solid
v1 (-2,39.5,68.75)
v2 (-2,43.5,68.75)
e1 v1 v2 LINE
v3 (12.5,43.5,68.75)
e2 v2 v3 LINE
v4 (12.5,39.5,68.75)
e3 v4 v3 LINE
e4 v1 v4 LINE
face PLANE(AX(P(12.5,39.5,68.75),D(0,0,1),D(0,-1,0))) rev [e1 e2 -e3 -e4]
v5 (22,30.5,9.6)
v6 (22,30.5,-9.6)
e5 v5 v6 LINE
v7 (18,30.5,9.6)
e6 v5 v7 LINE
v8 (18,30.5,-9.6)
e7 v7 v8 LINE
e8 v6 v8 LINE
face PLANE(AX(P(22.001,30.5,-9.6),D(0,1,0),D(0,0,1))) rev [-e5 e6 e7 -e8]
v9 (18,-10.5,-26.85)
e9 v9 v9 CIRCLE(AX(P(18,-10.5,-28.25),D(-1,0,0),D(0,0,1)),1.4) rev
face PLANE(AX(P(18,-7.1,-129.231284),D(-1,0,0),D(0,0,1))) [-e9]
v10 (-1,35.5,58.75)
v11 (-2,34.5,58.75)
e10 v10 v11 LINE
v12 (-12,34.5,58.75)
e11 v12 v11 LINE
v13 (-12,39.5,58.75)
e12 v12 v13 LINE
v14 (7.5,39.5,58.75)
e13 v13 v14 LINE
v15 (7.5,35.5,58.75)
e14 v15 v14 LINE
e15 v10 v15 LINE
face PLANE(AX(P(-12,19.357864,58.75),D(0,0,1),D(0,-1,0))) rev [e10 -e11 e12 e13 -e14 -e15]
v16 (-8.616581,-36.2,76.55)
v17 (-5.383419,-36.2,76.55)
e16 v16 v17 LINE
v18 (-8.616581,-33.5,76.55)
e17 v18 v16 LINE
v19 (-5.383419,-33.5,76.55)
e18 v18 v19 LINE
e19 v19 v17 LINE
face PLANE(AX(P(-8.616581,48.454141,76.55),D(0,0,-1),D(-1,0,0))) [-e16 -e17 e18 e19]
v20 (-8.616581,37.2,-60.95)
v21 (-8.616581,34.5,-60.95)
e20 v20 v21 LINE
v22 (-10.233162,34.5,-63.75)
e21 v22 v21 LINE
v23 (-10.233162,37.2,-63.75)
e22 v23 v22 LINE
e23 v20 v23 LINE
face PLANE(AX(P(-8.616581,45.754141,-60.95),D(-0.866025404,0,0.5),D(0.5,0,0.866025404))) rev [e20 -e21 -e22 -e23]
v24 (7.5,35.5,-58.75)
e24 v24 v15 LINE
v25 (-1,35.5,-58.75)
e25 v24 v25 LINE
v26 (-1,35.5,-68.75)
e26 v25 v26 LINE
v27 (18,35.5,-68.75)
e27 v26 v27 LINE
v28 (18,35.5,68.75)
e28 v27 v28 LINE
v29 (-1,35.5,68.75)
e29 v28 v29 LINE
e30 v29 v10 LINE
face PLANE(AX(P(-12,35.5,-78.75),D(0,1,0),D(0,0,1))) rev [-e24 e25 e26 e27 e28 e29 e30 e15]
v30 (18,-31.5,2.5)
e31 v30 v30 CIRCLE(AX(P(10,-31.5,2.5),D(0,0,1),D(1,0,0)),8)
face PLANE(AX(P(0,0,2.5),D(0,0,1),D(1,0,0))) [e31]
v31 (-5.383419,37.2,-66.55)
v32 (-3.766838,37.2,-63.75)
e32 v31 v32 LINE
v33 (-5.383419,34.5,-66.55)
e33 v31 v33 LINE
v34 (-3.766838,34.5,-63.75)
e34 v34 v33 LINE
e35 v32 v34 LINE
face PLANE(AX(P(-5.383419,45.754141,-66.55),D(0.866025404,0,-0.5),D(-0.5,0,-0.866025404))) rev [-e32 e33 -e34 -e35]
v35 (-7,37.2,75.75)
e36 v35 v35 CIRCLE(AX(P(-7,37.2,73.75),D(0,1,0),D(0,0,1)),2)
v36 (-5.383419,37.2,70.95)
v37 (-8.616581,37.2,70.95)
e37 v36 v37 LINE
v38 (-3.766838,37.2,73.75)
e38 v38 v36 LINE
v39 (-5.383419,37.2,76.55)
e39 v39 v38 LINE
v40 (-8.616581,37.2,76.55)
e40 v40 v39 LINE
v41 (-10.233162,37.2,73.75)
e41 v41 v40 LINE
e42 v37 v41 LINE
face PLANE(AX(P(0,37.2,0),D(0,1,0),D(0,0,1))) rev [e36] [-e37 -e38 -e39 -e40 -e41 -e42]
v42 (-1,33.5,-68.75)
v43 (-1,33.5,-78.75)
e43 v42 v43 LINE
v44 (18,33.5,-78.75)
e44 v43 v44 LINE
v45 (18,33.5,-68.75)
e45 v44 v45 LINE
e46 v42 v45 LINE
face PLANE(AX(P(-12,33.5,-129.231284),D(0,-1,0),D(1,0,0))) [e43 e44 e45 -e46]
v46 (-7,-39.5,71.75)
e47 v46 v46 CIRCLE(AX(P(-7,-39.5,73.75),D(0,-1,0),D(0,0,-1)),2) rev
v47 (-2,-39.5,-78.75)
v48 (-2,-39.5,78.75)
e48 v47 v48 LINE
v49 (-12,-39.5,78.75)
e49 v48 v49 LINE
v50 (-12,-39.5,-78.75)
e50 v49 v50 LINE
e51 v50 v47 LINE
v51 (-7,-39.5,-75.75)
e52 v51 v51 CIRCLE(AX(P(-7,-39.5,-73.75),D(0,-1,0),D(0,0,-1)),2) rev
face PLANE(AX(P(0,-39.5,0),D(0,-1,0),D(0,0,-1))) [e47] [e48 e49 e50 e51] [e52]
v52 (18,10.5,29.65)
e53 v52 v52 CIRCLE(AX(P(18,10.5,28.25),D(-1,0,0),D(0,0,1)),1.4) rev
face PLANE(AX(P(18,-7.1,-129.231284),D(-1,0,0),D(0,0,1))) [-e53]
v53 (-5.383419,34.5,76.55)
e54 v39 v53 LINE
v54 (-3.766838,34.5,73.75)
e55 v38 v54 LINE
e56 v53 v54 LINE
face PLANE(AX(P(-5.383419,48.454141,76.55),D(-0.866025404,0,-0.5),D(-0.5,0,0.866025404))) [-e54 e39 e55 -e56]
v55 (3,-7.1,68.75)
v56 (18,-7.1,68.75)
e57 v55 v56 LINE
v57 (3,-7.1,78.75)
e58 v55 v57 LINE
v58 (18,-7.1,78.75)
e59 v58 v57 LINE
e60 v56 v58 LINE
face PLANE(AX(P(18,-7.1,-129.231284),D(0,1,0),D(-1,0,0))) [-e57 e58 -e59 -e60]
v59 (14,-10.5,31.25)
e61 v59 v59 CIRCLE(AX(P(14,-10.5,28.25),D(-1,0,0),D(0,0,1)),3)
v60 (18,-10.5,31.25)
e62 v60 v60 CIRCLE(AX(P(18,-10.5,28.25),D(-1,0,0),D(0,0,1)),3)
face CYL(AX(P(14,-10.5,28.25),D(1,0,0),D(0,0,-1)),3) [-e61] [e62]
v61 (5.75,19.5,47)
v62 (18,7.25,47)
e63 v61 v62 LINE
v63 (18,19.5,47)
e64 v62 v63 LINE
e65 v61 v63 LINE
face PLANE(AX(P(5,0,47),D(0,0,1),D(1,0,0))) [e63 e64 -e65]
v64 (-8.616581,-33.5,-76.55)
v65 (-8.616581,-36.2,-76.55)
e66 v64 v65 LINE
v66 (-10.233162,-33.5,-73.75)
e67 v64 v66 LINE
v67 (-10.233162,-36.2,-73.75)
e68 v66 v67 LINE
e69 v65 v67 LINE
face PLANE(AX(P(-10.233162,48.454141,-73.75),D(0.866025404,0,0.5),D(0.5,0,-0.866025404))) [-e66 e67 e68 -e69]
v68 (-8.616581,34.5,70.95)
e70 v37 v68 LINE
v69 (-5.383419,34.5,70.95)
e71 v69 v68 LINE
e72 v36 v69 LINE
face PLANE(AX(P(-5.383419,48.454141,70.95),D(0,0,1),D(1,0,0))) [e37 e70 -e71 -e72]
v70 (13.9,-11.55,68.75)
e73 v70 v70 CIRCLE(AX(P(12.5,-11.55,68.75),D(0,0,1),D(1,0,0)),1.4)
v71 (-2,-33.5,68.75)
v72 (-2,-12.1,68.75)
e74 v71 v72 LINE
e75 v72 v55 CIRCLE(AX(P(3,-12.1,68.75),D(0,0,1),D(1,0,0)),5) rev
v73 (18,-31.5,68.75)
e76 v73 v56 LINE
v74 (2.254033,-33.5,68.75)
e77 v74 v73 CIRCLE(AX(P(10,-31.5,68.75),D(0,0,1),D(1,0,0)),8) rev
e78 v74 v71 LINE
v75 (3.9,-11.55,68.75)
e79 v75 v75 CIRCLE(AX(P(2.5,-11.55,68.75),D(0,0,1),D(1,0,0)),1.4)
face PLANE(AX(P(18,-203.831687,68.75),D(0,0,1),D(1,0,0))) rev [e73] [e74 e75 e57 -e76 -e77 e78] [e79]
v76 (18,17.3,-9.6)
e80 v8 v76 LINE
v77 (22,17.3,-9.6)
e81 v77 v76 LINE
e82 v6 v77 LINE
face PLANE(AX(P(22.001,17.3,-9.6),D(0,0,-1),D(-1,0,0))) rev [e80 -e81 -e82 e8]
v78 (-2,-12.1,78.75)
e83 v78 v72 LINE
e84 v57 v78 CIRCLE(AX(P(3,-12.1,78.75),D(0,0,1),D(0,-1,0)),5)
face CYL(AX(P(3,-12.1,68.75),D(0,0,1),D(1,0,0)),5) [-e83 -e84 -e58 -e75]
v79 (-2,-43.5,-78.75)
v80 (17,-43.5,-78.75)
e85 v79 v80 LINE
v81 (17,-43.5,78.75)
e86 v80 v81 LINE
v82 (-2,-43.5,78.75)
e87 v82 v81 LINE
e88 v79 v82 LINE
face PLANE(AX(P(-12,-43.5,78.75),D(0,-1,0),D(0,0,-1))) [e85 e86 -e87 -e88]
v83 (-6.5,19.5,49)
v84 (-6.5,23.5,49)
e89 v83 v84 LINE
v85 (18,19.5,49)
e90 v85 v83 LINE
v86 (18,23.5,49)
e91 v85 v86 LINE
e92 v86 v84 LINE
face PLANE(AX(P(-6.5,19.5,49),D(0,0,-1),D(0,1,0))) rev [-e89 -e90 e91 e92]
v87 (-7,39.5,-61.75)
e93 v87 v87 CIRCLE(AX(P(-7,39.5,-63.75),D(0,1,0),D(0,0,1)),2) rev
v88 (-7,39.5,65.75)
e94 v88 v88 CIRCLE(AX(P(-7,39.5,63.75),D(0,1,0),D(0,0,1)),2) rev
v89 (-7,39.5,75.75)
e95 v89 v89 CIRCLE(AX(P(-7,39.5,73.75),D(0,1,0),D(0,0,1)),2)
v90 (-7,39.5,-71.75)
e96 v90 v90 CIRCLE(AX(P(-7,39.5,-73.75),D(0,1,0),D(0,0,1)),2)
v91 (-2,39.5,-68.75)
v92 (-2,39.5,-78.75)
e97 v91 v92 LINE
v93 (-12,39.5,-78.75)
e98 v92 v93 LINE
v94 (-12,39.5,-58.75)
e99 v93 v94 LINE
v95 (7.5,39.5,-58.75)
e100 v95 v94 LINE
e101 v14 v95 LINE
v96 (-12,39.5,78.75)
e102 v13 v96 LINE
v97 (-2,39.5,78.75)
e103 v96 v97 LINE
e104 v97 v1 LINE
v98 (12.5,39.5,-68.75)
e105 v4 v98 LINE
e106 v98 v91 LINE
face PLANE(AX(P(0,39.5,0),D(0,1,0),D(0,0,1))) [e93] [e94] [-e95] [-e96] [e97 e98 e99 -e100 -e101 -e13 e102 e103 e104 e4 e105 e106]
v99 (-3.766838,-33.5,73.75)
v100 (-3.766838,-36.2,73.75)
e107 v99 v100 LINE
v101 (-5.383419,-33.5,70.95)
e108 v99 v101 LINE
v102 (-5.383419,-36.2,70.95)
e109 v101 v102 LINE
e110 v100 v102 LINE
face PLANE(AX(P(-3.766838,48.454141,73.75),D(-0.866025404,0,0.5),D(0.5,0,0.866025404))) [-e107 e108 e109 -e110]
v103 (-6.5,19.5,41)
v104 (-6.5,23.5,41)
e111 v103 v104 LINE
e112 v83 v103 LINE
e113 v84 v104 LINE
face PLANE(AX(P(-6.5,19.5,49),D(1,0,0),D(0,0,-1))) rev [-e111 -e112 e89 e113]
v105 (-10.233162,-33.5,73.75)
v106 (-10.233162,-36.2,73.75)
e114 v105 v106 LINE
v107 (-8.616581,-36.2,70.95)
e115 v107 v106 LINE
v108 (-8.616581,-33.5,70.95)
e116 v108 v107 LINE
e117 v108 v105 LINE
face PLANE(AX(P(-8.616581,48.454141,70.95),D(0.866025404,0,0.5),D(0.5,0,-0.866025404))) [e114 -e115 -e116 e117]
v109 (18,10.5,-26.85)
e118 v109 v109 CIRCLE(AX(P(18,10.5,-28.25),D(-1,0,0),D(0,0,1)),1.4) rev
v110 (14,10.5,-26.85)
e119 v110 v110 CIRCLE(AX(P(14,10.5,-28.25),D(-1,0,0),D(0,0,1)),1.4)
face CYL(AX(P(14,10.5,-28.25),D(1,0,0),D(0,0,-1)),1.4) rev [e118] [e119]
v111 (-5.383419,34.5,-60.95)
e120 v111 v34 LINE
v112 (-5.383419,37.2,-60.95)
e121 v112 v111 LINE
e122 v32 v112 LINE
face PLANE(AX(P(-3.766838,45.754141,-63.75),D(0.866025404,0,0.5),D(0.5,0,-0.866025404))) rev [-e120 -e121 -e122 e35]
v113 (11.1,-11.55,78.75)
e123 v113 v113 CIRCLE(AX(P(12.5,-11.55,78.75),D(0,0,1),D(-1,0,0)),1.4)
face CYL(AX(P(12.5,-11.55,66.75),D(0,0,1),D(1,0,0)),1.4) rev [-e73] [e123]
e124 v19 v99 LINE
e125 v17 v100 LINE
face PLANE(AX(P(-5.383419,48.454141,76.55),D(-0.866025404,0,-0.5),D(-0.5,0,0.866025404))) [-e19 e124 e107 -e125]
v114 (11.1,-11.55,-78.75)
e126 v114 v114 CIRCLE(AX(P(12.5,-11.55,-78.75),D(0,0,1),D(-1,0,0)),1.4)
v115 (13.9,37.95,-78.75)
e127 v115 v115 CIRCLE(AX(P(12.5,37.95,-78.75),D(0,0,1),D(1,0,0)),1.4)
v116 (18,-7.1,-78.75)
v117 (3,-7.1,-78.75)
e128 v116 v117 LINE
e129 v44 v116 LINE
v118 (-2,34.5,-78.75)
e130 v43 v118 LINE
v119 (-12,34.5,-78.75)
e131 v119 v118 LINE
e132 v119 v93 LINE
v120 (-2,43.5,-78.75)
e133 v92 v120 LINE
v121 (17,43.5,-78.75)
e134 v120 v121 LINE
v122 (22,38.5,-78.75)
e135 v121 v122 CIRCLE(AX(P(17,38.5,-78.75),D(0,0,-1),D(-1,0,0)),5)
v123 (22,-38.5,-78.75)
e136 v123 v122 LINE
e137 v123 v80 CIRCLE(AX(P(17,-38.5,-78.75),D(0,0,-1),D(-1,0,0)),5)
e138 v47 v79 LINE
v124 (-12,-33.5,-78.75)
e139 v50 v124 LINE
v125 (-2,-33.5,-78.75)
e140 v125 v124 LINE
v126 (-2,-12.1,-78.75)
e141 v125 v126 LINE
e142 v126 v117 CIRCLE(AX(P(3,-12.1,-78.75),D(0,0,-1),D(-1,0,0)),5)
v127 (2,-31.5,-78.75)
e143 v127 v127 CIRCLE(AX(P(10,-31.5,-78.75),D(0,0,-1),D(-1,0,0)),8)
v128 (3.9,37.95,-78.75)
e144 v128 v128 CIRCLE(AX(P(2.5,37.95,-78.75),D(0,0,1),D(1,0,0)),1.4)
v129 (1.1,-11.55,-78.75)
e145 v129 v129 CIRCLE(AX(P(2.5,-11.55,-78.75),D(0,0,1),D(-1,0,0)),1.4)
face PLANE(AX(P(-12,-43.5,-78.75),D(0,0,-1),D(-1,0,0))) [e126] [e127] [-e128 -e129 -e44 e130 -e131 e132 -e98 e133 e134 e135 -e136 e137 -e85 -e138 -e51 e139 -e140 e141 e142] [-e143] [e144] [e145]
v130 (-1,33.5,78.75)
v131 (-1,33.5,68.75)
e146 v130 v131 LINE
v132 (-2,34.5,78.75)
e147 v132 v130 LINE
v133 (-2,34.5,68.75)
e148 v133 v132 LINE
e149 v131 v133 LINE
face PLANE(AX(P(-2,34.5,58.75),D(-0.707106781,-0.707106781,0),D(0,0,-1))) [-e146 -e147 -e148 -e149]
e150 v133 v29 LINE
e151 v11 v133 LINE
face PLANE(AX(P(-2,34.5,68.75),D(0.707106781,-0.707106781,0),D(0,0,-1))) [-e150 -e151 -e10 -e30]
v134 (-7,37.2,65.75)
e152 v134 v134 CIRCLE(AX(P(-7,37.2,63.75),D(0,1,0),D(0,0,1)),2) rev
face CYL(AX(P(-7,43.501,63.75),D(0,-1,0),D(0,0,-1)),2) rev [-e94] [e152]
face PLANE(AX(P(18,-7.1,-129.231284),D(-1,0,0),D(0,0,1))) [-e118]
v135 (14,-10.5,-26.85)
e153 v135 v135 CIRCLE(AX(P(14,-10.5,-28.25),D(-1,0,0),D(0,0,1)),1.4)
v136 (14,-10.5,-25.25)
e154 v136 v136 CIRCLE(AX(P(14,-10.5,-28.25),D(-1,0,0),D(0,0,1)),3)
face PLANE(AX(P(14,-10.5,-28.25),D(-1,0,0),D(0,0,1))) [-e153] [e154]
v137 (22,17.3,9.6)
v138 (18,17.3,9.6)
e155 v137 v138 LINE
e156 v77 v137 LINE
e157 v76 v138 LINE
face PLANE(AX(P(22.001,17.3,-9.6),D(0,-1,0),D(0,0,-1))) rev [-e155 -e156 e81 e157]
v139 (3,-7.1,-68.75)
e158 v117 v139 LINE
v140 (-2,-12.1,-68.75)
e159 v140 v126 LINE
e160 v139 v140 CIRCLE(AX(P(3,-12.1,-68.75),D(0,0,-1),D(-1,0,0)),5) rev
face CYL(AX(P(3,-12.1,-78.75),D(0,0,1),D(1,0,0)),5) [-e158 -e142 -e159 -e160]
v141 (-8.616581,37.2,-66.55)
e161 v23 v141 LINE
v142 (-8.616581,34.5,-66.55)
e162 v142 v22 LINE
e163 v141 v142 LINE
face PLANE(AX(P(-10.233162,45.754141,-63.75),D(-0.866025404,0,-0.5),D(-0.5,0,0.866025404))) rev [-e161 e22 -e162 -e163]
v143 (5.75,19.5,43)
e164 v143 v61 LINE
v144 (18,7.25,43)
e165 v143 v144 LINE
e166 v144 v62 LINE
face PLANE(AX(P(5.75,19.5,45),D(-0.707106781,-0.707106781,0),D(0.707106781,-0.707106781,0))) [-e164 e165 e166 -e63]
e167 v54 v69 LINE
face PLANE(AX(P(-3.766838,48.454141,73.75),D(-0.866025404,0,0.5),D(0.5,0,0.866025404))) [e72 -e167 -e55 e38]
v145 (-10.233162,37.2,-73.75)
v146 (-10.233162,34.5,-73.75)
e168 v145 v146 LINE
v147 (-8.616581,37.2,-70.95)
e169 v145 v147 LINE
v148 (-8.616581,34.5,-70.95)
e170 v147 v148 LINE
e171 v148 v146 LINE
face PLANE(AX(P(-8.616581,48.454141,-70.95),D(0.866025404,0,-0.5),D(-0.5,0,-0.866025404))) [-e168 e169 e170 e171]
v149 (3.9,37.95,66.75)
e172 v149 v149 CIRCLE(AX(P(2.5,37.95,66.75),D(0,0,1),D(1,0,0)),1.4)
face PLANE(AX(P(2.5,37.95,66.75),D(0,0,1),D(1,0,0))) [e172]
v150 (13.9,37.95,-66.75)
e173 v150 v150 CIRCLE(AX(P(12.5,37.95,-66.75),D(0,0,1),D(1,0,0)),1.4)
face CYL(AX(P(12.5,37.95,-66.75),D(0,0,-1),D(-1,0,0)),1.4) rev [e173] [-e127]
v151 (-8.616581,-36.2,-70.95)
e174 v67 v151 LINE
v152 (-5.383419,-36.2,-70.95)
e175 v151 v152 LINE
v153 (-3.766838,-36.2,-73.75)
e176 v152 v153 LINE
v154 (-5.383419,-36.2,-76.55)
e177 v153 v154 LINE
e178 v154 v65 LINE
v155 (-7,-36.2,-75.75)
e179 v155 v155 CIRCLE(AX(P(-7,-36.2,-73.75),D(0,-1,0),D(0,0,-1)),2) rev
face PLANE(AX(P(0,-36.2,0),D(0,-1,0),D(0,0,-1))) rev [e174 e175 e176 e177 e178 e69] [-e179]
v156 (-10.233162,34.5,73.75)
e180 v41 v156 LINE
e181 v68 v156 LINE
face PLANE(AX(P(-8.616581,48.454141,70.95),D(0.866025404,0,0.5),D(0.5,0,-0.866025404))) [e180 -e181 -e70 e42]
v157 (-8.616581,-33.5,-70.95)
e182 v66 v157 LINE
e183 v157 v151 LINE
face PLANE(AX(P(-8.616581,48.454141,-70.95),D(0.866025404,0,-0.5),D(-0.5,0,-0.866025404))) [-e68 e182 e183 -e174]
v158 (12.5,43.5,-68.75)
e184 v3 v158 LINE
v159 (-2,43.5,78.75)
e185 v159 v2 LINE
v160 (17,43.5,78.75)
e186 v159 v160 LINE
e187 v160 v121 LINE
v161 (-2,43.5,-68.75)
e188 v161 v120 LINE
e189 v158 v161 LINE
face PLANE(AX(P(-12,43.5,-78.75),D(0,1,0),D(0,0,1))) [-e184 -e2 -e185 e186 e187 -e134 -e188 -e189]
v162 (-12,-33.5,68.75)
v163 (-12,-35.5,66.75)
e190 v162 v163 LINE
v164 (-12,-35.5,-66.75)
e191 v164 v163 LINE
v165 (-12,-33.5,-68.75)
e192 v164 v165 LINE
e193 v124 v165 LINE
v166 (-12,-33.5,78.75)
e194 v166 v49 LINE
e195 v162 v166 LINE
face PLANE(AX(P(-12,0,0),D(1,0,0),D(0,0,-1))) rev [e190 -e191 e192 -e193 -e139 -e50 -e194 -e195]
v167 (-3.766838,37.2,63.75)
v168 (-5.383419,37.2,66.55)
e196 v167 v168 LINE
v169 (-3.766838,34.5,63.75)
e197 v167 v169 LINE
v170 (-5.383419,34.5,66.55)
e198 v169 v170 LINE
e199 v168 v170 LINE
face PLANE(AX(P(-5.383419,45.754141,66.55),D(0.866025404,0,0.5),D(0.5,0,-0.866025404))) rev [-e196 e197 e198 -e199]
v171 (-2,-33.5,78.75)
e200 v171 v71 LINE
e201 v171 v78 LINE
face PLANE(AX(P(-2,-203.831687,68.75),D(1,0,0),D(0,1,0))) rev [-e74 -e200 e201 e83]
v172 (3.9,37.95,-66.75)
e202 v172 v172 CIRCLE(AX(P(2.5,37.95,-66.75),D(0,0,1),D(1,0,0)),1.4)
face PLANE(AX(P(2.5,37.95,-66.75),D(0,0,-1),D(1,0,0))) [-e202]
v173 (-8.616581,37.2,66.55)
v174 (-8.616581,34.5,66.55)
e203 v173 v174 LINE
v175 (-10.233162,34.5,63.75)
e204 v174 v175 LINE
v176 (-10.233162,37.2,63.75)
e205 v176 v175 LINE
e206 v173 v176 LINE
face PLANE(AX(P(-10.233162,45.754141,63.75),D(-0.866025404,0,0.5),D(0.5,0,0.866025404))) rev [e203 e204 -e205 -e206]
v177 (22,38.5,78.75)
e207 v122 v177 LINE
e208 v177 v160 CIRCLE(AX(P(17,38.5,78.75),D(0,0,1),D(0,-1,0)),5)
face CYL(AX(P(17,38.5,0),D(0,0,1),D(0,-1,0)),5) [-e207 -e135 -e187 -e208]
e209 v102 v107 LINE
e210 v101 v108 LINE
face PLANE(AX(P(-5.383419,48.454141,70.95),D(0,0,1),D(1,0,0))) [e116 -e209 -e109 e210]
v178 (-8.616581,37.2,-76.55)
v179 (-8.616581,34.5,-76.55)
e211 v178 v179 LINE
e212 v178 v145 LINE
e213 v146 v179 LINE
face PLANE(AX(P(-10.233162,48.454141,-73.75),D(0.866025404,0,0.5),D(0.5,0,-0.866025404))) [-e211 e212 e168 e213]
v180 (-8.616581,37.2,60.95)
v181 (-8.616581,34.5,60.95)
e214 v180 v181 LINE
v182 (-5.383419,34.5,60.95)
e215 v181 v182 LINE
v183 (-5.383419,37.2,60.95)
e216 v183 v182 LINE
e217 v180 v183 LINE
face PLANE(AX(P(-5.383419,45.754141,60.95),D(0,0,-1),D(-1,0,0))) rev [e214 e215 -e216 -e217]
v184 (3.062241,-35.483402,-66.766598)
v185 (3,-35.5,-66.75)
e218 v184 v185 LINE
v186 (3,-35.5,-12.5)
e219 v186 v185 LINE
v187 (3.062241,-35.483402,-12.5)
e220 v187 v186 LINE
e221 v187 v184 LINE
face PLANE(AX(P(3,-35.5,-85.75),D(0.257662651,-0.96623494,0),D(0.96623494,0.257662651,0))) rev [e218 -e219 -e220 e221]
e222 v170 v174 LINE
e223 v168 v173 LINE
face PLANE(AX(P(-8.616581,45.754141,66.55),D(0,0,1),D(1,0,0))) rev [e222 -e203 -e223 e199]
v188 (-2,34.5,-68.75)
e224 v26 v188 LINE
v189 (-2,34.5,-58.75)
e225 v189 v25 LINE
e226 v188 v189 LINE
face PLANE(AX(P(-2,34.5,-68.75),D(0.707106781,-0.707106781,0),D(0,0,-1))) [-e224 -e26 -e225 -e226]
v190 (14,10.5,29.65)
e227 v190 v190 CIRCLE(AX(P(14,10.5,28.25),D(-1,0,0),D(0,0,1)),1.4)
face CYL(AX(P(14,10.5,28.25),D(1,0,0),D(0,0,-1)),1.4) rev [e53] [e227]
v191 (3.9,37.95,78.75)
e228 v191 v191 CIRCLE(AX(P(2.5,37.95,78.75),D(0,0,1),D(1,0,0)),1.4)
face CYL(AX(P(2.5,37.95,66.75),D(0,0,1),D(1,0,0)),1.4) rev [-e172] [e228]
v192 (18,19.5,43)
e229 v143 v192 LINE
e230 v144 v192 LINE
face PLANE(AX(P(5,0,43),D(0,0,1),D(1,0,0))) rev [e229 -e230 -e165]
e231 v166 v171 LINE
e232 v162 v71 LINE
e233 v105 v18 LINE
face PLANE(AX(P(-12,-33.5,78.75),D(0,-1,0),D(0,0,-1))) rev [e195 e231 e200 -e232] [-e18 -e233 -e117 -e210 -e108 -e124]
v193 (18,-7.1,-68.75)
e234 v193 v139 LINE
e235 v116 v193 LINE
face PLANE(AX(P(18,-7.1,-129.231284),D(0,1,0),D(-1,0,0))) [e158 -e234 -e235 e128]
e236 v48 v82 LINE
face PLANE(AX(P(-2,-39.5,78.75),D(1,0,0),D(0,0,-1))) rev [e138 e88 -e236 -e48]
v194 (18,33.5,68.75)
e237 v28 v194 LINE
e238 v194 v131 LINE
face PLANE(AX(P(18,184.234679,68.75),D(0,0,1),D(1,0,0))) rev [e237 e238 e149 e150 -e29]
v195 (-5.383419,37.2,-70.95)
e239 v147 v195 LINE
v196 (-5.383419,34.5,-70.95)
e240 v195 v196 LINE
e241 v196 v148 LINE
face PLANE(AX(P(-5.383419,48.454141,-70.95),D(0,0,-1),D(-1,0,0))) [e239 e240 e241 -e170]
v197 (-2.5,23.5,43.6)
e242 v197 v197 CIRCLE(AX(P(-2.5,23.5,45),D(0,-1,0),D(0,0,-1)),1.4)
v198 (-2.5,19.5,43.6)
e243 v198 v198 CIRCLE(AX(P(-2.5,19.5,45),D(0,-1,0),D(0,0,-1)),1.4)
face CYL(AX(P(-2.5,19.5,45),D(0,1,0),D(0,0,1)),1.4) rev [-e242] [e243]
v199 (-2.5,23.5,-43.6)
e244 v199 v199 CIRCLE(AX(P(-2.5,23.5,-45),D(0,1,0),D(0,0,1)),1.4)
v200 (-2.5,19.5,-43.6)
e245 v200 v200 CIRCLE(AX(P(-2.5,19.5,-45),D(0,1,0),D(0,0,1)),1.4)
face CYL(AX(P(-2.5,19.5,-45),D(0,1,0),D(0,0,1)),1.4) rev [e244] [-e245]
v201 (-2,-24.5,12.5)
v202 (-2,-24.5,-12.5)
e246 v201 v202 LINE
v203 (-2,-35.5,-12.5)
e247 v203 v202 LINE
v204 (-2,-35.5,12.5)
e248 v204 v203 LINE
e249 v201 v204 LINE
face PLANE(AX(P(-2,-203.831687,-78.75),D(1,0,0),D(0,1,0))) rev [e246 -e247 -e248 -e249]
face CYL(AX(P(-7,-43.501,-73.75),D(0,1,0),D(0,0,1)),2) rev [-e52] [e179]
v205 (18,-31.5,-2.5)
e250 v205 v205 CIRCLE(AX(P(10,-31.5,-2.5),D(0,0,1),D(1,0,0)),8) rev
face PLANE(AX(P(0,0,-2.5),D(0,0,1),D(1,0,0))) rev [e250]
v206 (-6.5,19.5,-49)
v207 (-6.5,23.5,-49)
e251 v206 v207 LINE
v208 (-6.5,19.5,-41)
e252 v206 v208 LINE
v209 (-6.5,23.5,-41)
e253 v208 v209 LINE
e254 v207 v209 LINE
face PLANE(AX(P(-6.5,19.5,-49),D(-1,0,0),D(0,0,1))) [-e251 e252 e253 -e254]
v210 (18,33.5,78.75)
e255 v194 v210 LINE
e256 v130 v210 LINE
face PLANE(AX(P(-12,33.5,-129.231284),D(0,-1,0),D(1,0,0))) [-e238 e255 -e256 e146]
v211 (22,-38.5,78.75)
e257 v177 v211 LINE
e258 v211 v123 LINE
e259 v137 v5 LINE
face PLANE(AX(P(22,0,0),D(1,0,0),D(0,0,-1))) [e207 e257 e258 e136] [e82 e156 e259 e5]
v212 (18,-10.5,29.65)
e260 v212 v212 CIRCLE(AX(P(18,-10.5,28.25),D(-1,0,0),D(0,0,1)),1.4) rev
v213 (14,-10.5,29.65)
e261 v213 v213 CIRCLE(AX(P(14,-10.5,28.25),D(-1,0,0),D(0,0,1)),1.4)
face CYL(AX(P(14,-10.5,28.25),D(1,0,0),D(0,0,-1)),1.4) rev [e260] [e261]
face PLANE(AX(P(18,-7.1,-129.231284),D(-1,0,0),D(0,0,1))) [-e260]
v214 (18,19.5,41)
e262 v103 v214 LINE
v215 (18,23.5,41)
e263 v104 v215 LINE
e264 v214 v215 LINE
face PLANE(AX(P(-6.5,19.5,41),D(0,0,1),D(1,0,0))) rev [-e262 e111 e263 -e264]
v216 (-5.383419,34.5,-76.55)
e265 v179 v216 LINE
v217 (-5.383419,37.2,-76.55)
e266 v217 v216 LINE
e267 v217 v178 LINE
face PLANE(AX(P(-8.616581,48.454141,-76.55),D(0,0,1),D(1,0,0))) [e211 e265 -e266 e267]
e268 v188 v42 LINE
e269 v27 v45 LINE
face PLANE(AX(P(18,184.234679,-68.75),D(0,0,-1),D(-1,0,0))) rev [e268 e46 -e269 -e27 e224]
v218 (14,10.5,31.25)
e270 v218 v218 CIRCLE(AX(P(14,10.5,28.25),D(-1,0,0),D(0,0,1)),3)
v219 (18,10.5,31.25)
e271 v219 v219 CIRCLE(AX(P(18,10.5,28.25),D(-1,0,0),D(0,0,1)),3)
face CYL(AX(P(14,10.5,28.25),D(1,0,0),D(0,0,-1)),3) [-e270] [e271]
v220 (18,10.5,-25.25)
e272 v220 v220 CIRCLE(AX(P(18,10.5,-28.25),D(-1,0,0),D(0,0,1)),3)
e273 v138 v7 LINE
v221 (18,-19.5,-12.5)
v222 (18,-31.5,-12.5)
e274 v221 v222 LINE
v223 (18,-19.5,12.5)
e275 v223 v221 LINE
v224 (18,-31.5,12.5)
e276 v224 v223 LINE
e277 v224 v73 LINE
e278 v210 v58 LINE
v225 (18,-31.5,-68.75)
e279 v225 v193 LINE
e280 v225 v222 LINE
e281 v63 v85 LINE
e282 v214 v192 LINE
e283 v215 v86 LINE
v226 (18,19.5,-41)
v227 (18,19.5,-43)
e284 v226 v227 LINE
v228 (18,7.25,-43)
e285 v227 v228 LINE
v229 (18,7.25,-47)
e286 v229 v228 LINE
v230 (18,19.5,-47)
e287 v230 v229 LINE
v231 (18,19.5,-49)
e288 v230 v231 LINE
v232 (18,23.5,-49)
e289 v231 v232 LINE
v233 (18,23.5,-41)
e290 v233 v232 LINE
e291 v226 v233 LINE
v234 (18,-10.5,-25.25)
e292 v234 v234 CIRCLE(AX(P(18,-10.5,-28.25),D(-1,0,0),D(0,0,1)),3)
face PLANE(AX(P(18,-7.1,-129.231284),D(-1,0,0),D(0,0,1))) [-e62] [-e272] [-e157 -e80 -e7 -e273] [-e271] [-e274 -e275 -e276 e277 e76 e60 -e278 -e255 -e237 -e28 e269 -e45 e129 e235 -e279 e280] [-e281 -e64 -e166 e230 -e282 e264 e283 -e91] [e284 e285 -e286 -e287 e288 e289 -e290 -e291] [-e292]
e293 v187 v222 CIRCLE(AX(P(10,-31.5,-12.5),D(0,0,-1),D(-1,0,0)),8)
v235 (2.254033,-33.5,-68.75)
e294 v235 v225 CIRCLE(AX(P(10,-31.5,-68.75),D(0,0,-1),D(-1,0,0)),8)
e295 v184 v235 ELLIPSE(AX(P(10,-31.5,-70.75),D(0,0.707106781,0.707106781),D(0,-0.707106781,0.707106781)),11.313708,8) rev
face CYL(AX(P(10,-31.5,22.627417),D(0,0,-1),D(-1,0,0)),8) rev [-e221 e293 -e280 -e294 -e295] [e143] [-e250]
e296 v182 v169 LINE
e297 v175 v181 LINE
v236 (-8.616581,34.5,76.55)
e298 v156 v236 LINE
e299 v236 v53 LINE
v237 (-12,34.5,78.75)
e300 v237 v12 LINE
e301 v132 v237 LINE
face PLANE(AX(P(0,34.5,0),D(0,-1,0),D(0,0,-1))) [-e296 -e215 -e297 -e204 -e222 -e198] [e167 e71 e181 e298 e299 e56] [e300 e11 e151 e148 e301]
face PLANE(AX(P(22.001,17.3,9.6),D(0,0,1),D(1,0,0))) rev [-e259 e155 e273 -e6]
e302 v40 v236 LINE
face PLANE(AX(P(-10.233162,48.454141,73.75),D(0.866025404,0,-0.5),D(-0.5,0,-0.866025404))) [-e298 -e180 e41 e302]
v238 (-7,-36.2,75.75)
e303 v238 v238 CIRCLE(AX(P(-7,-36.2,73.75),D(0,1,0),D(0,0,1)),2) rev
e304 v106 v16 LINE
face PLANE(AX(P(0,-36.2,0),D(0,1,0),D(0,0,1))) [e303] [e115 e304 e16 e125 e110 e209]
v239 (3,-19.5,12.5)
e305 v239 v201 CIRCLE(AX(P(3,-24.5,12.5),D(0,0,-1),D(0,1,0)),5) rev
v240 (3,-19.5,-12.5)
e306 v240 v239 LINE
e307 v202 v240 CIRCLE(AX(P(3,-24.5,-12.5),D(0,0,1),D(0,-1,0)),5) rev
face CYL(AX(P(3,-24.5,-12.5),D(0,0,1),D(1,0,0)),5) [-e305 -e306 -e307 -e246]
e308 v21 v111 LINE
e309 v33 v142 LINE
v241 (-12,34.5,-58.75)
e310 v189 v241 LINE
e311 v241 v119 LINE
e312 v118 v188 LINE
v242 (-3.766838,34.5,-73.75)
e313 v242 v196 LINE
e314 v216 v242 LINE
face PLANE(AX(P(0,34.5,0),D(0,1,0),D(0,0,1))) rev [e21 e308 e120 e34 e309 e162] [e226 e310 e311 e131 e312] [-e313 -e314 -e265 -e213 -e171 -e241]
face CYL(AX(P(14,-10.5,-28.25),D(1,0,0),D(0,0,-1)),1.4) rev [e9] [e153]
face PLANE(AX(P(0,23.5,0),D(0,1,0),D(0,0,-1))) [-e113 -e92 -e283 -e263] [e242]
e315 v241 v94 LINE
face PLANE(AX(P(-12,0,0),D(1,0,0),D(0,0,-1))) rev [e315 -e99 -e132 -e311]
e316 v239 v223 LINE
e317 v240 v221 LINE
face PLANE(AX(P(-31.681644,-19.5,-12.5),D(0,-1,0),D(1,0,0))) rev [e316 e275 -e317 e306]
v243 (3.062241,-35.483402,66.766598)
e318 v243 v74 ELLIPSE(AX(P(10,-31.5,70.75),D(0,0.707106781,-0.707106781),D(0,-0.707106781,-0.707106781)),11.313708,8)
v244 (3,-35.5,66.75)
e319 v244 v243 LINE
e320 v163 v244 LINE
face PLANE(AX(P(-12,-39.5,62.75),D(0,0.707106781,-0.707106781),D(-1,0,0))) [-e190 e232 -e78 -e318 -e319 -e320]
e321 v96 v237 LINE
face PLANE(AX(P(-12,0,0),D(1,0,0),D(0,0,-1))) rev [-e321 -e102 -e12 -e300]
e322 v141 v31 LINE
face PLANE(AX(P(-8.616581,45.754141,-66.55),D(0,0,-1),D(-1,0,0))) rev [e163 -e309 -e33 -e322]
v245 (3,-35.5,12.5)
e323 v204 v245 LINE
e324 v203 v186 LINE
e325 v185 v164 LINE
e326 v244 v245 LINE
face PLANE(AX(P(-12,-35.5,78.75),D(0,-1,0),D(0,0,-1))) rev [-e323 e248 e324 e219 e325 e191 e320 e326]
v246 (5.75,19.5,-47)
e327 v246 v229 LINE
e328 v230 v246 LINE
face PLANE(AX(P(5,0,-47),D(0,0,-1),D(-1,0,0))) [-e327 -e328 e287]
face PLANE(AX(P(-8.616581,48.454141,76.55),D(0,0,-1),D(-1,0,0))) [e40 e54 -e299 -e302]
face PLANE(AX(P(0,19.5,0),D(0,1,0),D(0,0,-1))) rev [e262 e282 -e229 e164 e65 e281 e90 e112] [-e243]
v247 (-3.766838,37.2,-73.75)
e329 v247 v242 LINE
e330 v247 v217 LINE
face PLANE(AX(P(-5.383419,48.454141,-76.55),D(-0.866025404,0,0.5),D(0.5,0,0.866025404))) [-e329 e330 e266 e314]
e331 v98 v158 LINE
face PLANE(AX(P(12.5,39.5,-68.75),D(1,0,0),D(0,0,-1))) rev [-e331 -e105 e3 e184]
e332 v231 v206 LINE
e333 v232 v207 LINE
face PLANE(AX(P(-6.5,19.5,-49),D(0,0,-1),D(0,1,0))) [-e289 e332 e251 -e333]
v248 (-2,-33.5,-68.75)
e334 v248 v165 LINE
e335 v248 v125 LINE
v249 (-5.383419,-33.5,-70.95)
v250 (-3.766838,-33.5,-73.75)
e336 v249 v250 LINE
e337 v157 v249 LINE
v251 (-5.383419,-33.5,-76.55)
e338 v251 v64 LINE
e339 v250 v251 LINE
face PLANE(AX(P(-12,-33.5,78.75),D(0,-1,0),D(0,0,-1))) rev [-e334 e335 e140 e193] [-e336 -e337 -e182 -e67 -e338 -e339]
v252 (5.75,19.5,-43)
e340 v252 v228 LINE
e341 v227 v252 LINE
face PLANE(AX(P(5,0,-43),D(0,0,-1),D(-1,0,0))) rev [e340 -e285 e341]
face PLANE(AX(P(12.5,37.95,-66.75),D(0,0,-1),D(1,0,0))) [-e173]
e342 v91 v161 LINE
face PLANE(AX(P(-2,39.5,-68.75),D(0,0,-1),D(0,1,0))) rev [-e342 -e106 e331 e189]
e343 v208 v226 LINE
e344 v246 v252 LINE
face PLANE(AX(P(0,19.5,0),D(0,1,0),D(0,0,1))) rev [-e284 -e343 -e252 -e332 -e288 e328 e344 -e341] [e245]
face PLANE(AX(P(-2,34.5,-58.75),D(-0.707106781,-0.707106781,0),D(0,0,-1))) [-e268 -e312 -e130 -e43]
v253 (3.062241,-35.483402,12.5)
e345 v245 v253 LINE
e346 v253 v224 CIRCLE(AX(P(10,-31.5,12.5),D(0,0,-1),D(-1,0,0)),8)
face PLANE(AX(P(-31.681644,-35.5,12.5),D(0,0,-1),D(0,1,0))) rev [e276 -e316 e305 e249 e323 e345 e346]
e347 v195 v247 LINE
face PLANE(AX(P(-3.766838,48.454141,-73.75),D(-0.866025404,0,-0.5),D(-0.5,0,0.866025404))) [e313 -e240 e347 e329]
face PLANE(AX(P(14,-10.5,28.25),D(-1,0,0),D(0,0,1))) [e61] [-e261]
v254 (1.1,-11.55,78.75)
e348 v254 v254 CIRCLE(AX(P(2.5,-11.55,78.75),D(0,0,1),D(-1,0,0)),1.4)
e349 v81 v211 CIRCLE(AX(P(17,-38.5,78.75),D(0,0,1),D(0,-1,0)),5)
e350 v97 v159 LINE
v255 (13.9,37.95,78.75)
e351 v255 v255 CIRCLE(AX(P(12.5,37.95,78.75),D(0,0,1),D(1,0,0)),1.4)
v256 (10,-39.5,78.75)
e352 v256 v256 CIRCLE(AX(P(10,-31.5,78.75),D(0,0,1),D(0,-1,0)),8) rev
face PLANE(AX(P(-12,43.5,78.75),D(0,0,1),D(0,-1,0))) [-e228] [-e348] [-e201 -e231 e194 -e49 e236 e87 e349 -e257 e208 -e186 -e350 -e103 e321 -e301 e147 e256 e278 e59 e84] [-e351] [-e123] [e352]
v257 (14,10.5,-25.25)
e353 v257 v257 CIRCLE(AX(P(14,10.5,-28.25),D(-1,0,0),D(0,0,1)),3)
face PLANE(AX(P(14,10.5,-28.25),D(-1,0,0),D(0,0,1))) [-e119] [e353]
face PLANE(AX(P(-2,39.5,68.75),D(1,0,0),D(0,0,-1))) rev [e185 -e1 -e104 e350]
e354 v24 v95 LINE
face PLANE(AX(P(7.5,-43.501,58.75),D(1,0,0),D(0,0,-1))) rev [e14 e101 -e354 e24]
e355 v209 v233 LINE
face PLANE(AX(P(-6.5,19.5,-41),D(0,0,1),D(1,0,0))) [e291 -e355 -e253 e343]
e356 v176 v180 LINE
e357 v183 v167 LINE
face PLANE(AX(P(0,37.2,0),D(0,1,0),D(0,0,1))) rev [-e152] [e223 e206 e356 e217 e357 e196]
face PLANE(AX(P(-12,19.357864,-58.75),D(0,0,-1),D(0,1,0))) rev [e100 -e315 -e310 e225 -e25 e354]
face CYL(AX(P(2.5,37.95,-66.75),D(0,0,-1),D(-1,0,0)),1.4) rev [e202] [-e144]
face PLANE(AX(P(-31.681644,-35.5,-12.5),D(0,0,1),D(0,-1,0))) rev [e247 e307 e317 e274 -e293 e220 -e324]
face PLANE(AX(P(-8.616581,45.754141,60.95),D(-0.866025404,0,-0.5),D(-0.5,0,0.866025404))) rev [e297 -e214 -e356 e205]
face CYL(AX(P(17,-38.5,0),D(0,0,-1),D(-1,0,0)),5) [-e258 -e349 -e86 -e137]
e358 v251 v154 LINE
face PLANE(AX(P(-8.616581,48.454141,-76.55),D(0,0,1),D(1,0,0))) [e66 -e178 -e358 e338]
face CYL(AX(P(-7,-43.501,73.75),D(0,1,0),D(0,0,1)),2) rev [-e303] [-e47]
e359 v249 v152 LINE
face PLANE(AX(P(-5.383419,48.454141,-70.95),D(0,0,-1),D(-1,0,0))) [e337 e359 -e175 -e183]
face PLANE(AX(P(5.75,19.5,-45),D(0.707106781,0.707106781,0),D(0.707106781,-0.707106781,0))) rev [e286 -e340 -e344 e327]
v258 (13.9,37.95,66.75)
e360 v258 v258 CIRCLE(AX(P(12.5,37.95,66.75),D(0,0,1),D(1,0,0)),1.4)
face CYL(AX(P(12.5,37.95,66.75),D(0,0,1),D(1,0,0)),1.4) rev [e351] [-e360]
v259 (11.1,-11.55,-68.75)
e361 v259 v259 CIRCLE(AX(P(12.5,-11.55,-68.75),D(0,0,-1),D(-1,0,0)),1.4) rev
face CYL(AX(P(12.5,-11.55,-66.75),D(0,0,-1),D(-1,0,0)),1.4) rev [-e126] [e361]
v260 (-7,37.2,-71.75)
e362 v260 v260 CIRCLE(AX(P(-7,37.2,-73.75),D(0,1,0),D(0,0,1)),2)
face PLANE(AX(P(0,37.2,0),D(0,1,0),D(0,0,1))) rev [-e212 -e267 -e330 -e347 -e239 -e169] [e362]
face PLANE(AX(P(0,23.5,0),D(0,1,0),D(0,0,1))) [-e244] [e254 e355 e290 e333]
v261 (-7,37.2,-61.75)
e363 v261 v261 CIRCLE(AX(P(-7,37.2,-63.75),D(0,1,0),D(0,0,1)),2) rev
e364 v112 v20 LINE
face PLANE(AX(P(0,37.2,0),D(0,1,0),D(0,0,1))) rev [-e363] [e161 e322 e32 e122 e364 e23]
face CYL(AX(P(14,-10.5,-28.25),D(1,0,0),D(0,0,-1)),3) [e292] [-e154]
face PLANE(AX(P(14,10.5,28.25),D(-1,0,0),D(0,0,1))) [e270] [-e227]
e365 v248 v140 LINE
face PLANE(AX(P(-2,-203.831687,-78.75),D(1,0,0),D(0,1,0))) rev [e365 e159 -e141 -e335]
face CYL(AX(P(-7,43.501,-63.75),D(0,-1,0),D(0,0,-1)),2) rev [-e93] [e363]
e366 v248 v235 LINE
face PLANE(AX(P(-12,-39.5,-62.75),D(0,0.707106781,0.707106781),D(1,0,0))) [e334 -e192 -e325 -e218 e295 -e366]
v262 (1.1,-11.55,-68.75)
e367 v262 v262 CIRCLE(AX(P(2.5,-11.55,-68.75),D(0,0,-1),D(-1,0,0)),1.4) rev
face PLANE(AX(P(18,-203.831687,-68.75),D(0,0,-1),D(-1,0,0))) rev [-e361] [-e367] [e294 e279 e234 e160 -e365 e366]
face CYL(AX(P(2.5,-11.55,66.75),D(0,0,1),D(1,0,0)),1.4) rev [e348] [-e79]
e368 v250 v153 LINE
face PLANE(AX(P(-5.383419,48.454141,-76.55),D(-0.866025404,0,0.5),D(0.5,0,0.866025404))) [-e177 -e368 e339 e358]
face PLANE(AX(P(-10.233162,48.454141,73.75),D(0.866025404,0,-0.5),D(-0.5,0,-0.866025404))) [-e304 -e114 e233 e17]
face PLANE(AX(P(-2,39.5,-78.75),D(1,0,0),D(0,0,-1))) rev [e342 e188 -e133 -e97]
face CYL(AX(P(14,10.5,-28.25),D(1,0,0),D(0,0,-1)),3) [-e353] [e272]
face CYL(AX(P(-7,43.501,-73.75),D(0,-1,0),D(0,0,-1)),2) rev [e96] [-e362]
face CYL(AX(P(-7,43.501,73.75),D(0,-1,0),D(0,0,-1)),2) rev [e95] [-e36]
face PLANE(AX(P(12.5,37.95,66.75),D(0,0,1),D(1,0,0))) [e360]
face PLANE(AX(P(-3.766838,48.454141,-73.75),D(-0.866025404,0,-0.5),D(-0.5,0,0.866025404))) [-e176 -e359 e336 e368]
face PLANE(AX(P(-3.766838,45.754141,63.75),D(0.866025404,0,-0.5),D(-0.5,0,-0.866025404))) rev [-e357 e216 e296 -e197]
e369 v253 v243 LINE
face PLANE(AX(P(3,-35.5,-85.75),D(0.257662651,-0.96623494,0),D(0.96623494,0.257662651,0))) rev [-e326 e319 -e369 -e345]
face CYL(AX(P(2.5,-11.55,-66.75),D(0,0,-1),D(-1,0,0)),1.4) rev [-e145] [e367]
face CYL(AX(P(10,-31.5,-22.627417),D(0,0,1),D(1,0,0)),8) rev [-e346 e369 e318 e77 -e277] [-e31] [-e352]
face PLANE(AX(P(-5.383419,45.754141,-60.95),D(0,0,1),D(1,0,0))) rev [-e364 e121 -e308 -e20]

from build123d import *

# Parameters (mm, degrees)
SKETCH202_W                           = 157.5
SKETCH202_H                           = 87
CUERPO_BASE_DEPTH                     = 34
SKETCH203_W                           = 30
SKETCH203_H                           = 40.6
CAVIDAD_SERVOS_DEPTH                  = 157.5
CUT_EXTRUDE94_DEPTH                   = 26.4
SKETCH315_W                           = 15
SKETCH315_H                           = 137.5
CUT_EXTRUDE95_DEPTH                   = 6
SKETCH319_W                           = 15
SKETCH319_H                           = 137.5
CUT_EXTRUDE99_DEPTH                   = 2
SKETCH327_W                           = 30
SKETCH327_H                           = 137.5
CUT_EXTRUDE106_DEPTH                  = 2
CUT_EXTRUDE101_DEPTH                  = 4
SKETCH322_W                           = 10
SKETCH322_H                           = 157.5
CUT_EXTRUDE102_DEPTH                  = 4
CHAMFER23_SIZE                        = 4
SKETCH332_W                           = 10
SKETCH332_H                           = 10
BOSS_EXTRUDE4_DEPTH                   = 2
SKETCH338_W                           = 10
SKETCH338_H                           = 20
CUT_EXTRUDE110_DEPTH                  = 1
CHAMFER24_SIZE                        = 6
FILLET10_R                            = 5
SKETCH313_R                           = 1.4
CUT_EXTRUDE93_DEPTH                   = 12
AGUJEROS_ESTRUCTURA_REACH             = 114.315
SKETCH323_R                           = 2
AGUJEROS_ESTRUCTURA_DIRECTION_2_REACH = 114.315
TUERCAS_START                         = -2.7
TUERCAS_OUTLINE_R                     = 2
TUERCAS_DEPTH                         = 73.4
CUT_EXTRUDE107_REACH                  = 114.315
SKETCH334_R                           = 2
TUERCAS_2_DEPTH                       = 3.7
FILLET11_R                            = 5
RELLENO_PREVIO_REACH                  = 157.346
BOSS_EXTRUDE3_REACH                   = 96.836
SKETCH331_W                           = 25
SKETCH331_H                           = 16
VARILLAALUMINIO_REACH                 = 105.454
SKETCH329_R                           = 8
VARILLAALUMINIO_DIRECTION_2_DEPTH     = 10
FILLET12_R                            = 5
CUT_EXTRUDE109_REACH                  = 118.51
SKETCH337_W                           = 19.5
SKETCH337_H                           = 117.5
CHAMFER25_START                       = -78.75
CHAMFER25_DEPTH                       = 158.75
CHAMFER25_2_DEPTH                     = 20
CHAMFER25_START_2                     = 58.75
CHAMFER25_3_DEPTH                     = 20
SKETCH339_W                           = 24.5
SKETCH339_H                           = 8
SKETCH339_R                           = 1.4
BOSS_EXTRUDE5_DEPTH                   = 4
RIB2_REACH                            = 135.005
SKETCH342_WALL_W                      = 285.333984378
SKETCH342_WALL_H                      = 4
SKETCH343_R                           = 3
SKETCH343_R_2                         = 1.4
BOSS_EXTRUDE6_DEPTH                   = 4
CUT_EXTRUDE111_REACH                  = 96.836
SKETCH344_W                           = 19.2
SKETCH344_H                           = 13.2


with BuildPart() as part:
    # Sketch202 → Cuerpo_base (new body)
    with BuildSketch(Plane(origin=(22, 0, 0), x_dir=(0, 0, -1), z_dir=(1, 0, 0))):
        Rectangle(SKETCH202_W, SKETCH202_H)
    extrude(amount=-CUERPO_BASE_DEPTH)

    # Sketch203 → Cavidad_servos (cut)
    with BuildSketch(Plane(origin=(55.25, 0, 78.75), x_dir=(-1, 0, 0), z_dir=(0, 0, -1))):
        with Locations((52.25, 13.2)):
            Rectangle(SKETCH203_W, SKETCH203_H)
    extrude(amount=CAVIDAD_SERVOS_DEPTH, mode=Mode.SUBTRACT)

    # Sketch314 → Cut-Extrude94 (cut)
    with BuildSketch(Plane(origin=(0, -7.1, 0), x_dir=(1, 0, 0), z_dir=(0, 1, 0))):
        Polygon((18, 68.75), (-2, 68.75), (-2, 78.75), (-12, 78.75), (-12, -78.75), (-2, -78.75), (-2, -68.75), (18, -68.75), align=None)
    extrude(amount=-CUT_EXTRUDE94_DEPTH, mode=Mode.SUBTRACT)

    # Sketch315 → Cut-Extrude95 (cut)
    with BuildSketch(Plane(origin=(0, -33.5, 0), x_dir=(1, 0, 0), z_dir=(0, 1, 0))):
        with Locations((10.5, 0)):
            Rectangle(SKETCH315_W, SKETCH315_H)
    extrude(amount=-CUT_EXTRUDE95_DEPTH, mode=Mode.SUBTRACT)

    # Sketch319 → Cut-Extrude99 (cut)
    with BuildSketch(Plane(origin=(0, -33.5, 0), x_dir=(1, 0, 0), z_dir=(0, 1, 0))):
        with Locations((-4.5, 0)):
            Rectangle(SKETCH319_W, SKETCH319_H)
    extrude(amount=-CUT_EXTRUDE99_DEPTH, mode=Mode.SUBTRACT)

    # Sketch327 → Cut-Extrude106 (cut)
    with BuildSketch(Plane.XZ.offset(-33.5)):
        with Locations((3, 0)):
            Rectangle(SKETCH327_W, SKETCH327_H)
    extrude(amount=-CUT_EXTRUDE106_DEPTH, mode=Mode.SUBTRACT)

    # Sketch321 → Cut-Extrude101 (cut)
    with BuildSketch(Plane(origin=(0, 43.5, 0), x_dir=(1, 0, 0), z_dir=(0, 1, 0))):
        Polygon((-12, 78.75), (-2, 78.75), (-2, 68.75), (12.5, 68.75), (12.5, -68.75), (-2, -68.75), (-2, -78.75), (-12, -78.75), align=None)
    extrude(amount=-CUT_EXTRUDE101_DEPTH, mode=Mode.SUBTRACT)

    # Sketch322 → Cut-Extrude102 (cut)
    with BuildSketch(Plane.XZ.offset(43.5)):
        with Locations((-7, 0)):
            Rectangle(SKETCH322_W, SKETCH322_H)
    extrude(amount=-CUT_EXTRUDE102_DEPTH, mode=Mode.SUBTRACT)

    # Chamfer23
    chamfer23_edges = [part.edges().sort_by_distance(p)[0] for p in [
        (18, -39.5, 0),
        (3, -39.5, 0),
    ]]
    chamfer(chamfer23_edges, length=CHAMFER23_SIZE - 0.0001)  # a hair under: the kernel refuses the full size

    # Sketch332 → Boss-Extrude4 (add)
    with BuildSketch(Plane.XZ.offset(-35.5)):
        with Locations((-7, -63.75)):
            Rectangle(SKETCH332_W, SKETCH332_H)
        with Locations((-7, 63.75)):
            Rectangle(SKETCH332_W, SKETCH332_H)
    extrude(amount=BOSS_EXTRUDE4_DEPTH)

    # Sketch338 → Cut-Extrude110 (cut)
    with BuildSketch(Plane.XZ.offset(-33.5)):
        with Locations((-7, -68.75)):
            Rectangle(SKETCH338_W, SKETCH338_H)
        with Locations((-7, 68.75)):
            Rectangle(SKETCH338_W, SKETCH338_H)
    extrude(amount=-CUT_EXTRUDE110_DEPTH, mode=Mode.SUBTRACT)

    # Chamfer24
    chamfer24_edges = [part.edges().sort_by_distance(p)[0] for p in [
        (10.5, -39.5, 68.75),
        (10.5, -39.5, -68.75),
    ]]
    chamfer(chamfer24_edges, length=CHAMFER24_SIZE)

    # Fillet10
    fillet10_edges = [part.edges().sort_by_distance(p)[0] for p in [
        (22, -43.5, 0),
        (22, 43.5, 0),
    ]]
    fillet(fillet10_edges, radius=FILLET10_R)

    # Sketch313 → Cut-Extrude93 (cut)
    with BuildSketch(Plane.XY.offset(78.75)):
        with Locations((12.5, 37.95)):
            Circle(SKETCH313_R)
        with Locations((2.5, 37.95)):
            Circle(SKETCH313_R)
        with Locations((2.5, -11.55)):
            Circle(SKETCH313_R)
        with Locations((12.5, -11.55)):
            Circle(SKETCH313_R)
    cut_extrude93 = extrude(amount=-CUT_EXTRUDE93_DEPTH, mode=Mode.SUBTRACT)

    # Mirror1: Cut-Extrude93 across plane
    add(cut_extrude93.mirror(Plane.XY), mode=Mode.SUBTRACT)

    # Sketch323 → Agujeros_Estructura (cut, up to next)
    with BuildSketch(Plane(origin=(0, -33.5, 0), x_dir=(1, 0, 0), z_dir=(0, 1, 0)), mode=Mode.PRIVATE) as agujeros_estructura_sk1:
        with Locations(Location((-7, -73.75, 0), (0, 0, 90))):
            Circle(SKETCH323_R)
    agujeros_estructura_tool1 = extrude(agujeros_estructura_sk1.sketch, amount=-AGUJEROS_ESTRUCTURA_REACH, mode=Mode.PRIVATE) & part.part
    # Sketch323 → Agujeros_Estructura (cut, up to next)
    with BuildSketch(Plane(origin=(0, -33.5, 0), x_dir=(1, 0, 0), z_dir=(0, 1, 0)), mode=Mode.PRIVATE) as agujeros_estructura_sk2:
        with Locations(Location((-7, 73.75, 0), (0, 0, 270))):
            Circle(SKETCH323_R)
    agujeros_estructura_tool2 = extrude(agujeros_estructura_sk2.sketch, amount=-AGUJEROS_ESTRUCTURA_REACH, mode=Mode.PRIVATE) & part.part
    add(agujeros_estructura_tool1.solids().sort_by_distance((-7, -33.5, 73.75))[0], mode=Mode.SUBTRACT)
    add(agujeros_estructura_tool2.solids().sort_by_distance((-7, -33.5, -73.75))[0], mode=Mode.SUBTRACT)

    # Sketch323 → Agujeros_Estructura direction 2 (cut, up to next)
    with BuildSketch(Plane(origin=(0, -33.5, 0), x_dir=(1, 0, 0), z_dir=(0, 1, 0)), mode=Mode.PRIVATE) as agujeros_estructura_direction_2_sk1:
        with Locations(Location((-7, -73.75, 0), (0, 0, 90))):
            Circle(SKETCH323_R)
    agujeros_estructura_direction_2_tool1 = extrude(agujeros_estructura_direction_2_sk1.sketch, amount=AGUJEROS_ESTRUCTURA_DIRECTION_2_REACH, mode=Mode.PRIVATE) & part.part
    # Sketch323 → Agujeros_Estructura direction 2 (cut, up to next)
    with BuildSketch(Plane(origin=(0, -33.5, 0), x_dir=(1, 0, 0), z_dir=(0, 1, 0)), mode=Mode.PRIVATE) as agujeros_estructura_direction_2_sk2:
        with Locations(Location((-7, 73.75, 0), (0, 0, 270))):
            Circle(SKETCH323_R)
    agujeros_estructura_direction_2_tool2 = extrude(agujeros_estructura_direction_2_sk2.sketch, amount=AGUJEROS_ESTRUCTURA_DIRECTION_2_REACH, mode=Mode.PRIVATE) & part.part
    add(agujeros_estructura_direction_2_tool1.solids().sort_by_distance((-7, -33.5, 73.75))[0], mode=Mode.SUBTRACT)
    add(agujeros_estructura_direction_2_tool2.solids().sort_by_distance((-7, -33.5, -73.75))[0], mode=Mode.SUBTRACT)

    # Tuercas: read off the stored shape, not the designer's step
    # Tuercas outline → Tuercas (cut)
    # profile 1 of 2: a face of its own
    with BuildSketch(Plane(origin=(0, -33.5, 0), x_dir=(1, 0, 0), z_dir=(0, 1, 0)).offset(TUERCAS_START)):
        Polygon((-5.383419246, -70.95), (-8.616580754, -70.95), (-10.233161507, -73.75), (-8.616580754, -76.55), (-5.383419246, -76.55), (-3.766838493, -73.75), align=None)
        with Locations((-7, -73.75)):
            Circle(TUERCAS_OUTLINE_R, mode=Mode.SUBTRACT)
    # profile 2 of 2: a face of its own
    with BuildSketch(Plane(origin=(0, -33.5, 0), x_dir=(1, 0, 0), z_dir=(0, 1, 0)).offset(TUERCAS_START)):
        Polygon((-5.383419246, 76.55), (-8.616580754, 76.55), (-10.233161507, 73.75), (-8.616580754, 70.95), (-5.383419246, 70.95), (-3.766838493, 73.75), align=None)
        with Locations((-7, 73.75)):
            Circle(TUERCAS_OUTLINE_R, mode=Mode.SUBTRACT)
    extrude(amount=TUERCAS_DEPTH, mode=Mode.SUBTRACT)

    # Sketch334 → Cut-Extrude107 (cut, up to next)
    with BuildSketch(Plane.XZ.offset(-33.5), mode=Mode.PRIVATE) as cut_extrude107_sk1:
        with Locations(Location((-7, -63.75, 0), (0, 0, 90))):
            Circle(SKETCH334_R)
    cut_extrude107_tool1 = extrude(cut_extrude107_sk1.sketch, amount=-CUT_EXTRUDE107_REACH, mode=Mode.PRIVATE) & part.part
    # Sketch334 → Cut-Extrude107 (cut, up to next)
    with BuildSketch(Plane.XZ.offset(-33.5), mode=Mode.PRIVATE) as cut_extrude107_sk2:
        with Locations(Location((-7, 63.75, 0), (0, 0, 270))):
            Circle(SKETCH334_R)
    cut_extrude107_tool2 = extrude(cut_extrude107_sk2.sketch, amount=-CUT_EXTRUDE107_REACH, mode=Mode.PRIVATE) & part.part
    add(cut_extrude107_tool1.solids().sort_by_distance((-7, 33.5, -63.75))[0], mode=Mode.SUBTRACT)
    add(cut_extrude107_tool2.solids().sort_by_distance((-7, 33.5, 63.75))[0], mode=Mode.SUBTRACT)

    # Sketch335 → Tuercas_2 (cut)
    with BuildSketch(Plane.XZ.offset(-33.5)):
        Polygon((-10.233161507, -63.75), (-8.616580754, -66.55), (-5.383419246, -66.55), (-3.766838493, -63.75), (-5.383419246, -60.95), (-8.616580754, -60.95), align=None)
        Polygon((-8.616580754, 60.95), (-10.233161507, 63.75), (-8.616580754, 66.55), (-5.383419246, 66.55), (-3.766838493, 63.75), (-5.383419246, 60.95), align=None)
    extrude(amount=-TUERCAS_2_DEPTH, mode=Mode.SUBTRACT)

    # Fillet11
    fillet11_edges = [part.edges().sort_by_distance(p)[0] for p in [
        (-2, -7.1, -73.75),
        (-2, -7.1, 73.75),
    ]]
    fillet(fillet11_edges, radius=FILLET11_R)

    # Relleno previo: up to this face of the body (flat: up to its plane)
    relleno_previo_end = Plane(part.part.faces().sort_by_distance((8.105455585, -20.638186565, -68.75))[0])
    # Sketch330 → Relleno previo (add, up to the picked face)
    with BuildSketch(Plane(origin=(0, 0, 68.75), x_dir=(-1, 0, 0), z_dir=(0, 0, -1)), mode=Mode.PRIVATE) as relleno_previo_sk1:
        Polygon((-3, -35.5), (-18, -31.5), (-18, -39.5), (-3, -39.5), align=None)
    relleno_previo_tool1 = split(extrude(relleno_previo_sk1.sketch, amount=RELLENO_PREVIO_REACH, mode=Mode.PRIVATE), bisect_by=relleno_previo_end, keep=Keep.BOTH, mode=Mode.PRIVATE)
    add(relleno_previo_tool1.solids().sort_by(Axis((11.333333, -36.388889, 68.75), (0, 0, -1)))[0])

    # Boss-Extrude3: up to this face of the body (flat: up to its plane)
    boss_extrude3_end = Plane(part.part.faces().sort_by_distance((-2, -22.8, -73.75))[0])
    # Sketch331 → Boss-Extrude3 (add, up to the picked face)
    with BuildSketch(Plane.ZY.offset(-18), mode=Mode.PRIVATE) as boss_extrude3_sk1:
        with Locations((0, -27.5)):
            Rectangle(SKETCH331_W, SKETCH331_H)
    boss_extrude3_tool1 = split(extrude(boss_extrude3_sk1.sketch, amount=BOSS_EXTRUDE3_REACH, mode=Mode.PRIVATE), bisect_by=boss_extrude3_end, keep=Keep.BOTH, mode=Mode.PRIVATE)
    add(boss_extrude3_tool1.solids().sort_by(Axis((18, -27.5, 0), (-1, 0, 0)))[0])

    # Sketch329 → VarillaAluminio (cut, up to next)
    with BuildSketch(Plane(origin=(0, 0, 12.5), x_dir=(-1, 0, 0), z_dir=(0, 0, -1)), mode=Mode.PRIVATE) as varillaaluminio_sk1:
        with Locations(Location((-10, -31.5, 0), (0, 0, 180))):
            Circle(SKETCH329_R)
    varillaaluminio_tool1 = extrude(varillaaluminio_sk1.sketch, amount=-VARILLAALUMINIO_REACH, mode=Mode.PRIVATE) & part.part
    varillaaluminio = varillaaluminio_tool1.solids().sort_by_distance((10, -31.5, 12.5))[0]
    add(varillaaluminio, mode=Mode.SUBTRACT)

    # Sketch329 → VarillaAluminio direction 2 (cut)
    with BuildSketch(Plane(origin=(0, 0, 12.5), x_dir=(-1, 0, 0), z_dir=(0, 0, -1))):
        with Locations(Location((-10, -31.5, 0), (0, 0, 180))):
            Circle(SKETCH329_R)
    varillaaluminio_direction_2 = extrude(amount=VARILLAALUMINIO_DIRECTION_2_DEPTH, mode=Mode.SUBTRACT)

    # Mirror2: VarillaAluminio, VarillaAluminio direction 2 across plane
    add(varillaaluminio.mirror(Plane.XY), mode=Mode.SUBTRACT)
    add(varillaaluminio_direction_2.mirror(Plane.XY), mode=Mode.SUBTRACT)

    # Fillet12
    fillet12_edges = [part.edges().sort_by_distance(p)[0] for p in [
        (-2, -19.5, 0),
    ]]
    fillet(fillet12_edges, radius=FILLET12_R)

    # Sketch337 → Cut-Extrude109 (cut, up to next)
    with BuildSketch(Plane(origin=(0, 39.5, 0), x_dir=(1, 0, 0), z_dir=(0, 1, 0)), mode=Mode.PRIVATE) as cut_extrude109_sk1:
        with Locations((-2.25, 0)):
            Rectangle(SKETCH337_W, SKETCH337_H)
    cut_extrude109_tool1 = extrude(cut_extrude109_sk1.sketch, amount=-CUT_EXTRUDE109_REACH, mode=Mode.PRIVATE) & part.part
    add(cut_extrude109_tool1.solids().sort_by_distance((-2.25, 39.5, 0))[0], mode=Mode.SUBTRACT)

    # Chamfer25: read off the stored shape, not the designer's step
    # Chamfer25 outline → Chamfer25 (cut)
    with BuildSketch(Plane.XY.offset(CHAMFER25_START)):
        Polygon((-1, 33.5), (-2, 34.5), (-2, 33.5), align=None)
    extrude(amount=CHAMFER25_DEPTH, mode=Mode.SUBTRACT)

    # Chamfer25 2 outline → Chamfer25 2 (add)
    with BuildSketch(Plane.XY.offset(CHAMFER25_START)):
        Polygon((-2, 35.5), (-2, 34.5), (-1, 35.5), align=None)
    extrude(amount=CHAMFER25_2_DEPTH)

    # Chamfer25 3 outline → Chamfer25 3 (add)
    with BuildSketch(Plane.XY.offset(CHAMFER25_START_2)):
        Polygon((-2, 35.5), (-2, 34.5), (-1, 35.5), align=None)
    extrude(amount=CHAMFER25_3_DEPTH)

    # Sketch339 → Boss-Extrude5 (add)
    with BuildSketch(Plane(origin=(0, 23.5, 0), x_dir=(1, 0, 0), z_dir=(0, 1, 0))):
        with Locations((5.75, 45)):
            Rectangle(SKETCH339_W, SKETCH339_H)
        with Locations(Location((-2.5, 45, 0), (0, 0, 270))):
            Circle(SKETCH339_R, mode=Mode.SUBTRACT)
    boss_extrude5 = extrude(amount=-BOSS_EXTRUDE5_DEPTH)

    # Sketch342 wall → Rib2 (add, up to next)
    with BuildSketch(Plane(origin=(11.875, 13.375, -45), x_dir=(0.707106781187, -0.707106781187, 0), z_dir=(-0.707106781187, -0.707106781187, 0)), mode=Mode.PRIVATE) as rib2_sk1:
        Rectangle(SKETCH342_WALL_W, SKETCH342_WALL_H)
    rib2_tool1 = extrude(rib2_sk1.sketch, amount=-RIB2_REACH, mode=Mode.PRIVATE) - part.part
    rib2 = rib2_tool1.solids().sort_by_distance((11.875, 13.375, -45))[0]
    add(rib2)

    # Mirror3: Boss-Extrude5, Rib2 across plane
    add(boss_extrude5.mirror(Plane.XY))
    add(rib2.mirror(Plane.XY))

    # Sketch343 → Boss-Extrude6 (add)
    # profile 1 of 4: a face of its own
    with BuildSketch(Plane.ZY.offset(-18)):
        with Locations((-28.25, -10.5)):
            Circle(SKETCH343_R)
        with Locations((-28.25, -10.5)):
            Circle(SKETCH343_R_2, mode=Mode.SUBTRACT)
    # profile 2 of 4: a face of its own
    with BuildSketch(Plane.ZY.offset(-18)):
        with Locations((-28.25, 10.5)):
            Circle(SKETCH343_R)
        with Locations((-28.25, 10.5)):
            Circle(SKETCH343_R_2, mode=Mode.SUBTRACT)
    # profile 3 of 4: a face of its own
    with BuildSketch(Plane.ZY.offset(-18)):
        with Locations((28.25, 10.5)):
            Circle(SKETCH343_R)
        with Locations((28.25, 10.5)):
            Circle(SKETCH343_R_2, mode=Mode.SUBTRACT)
    # profile 4 of 4: a face of its own
    with BuildSketch(Plane.ZY.offset(-18)):
        with Locations((28.25, -10.5)):
            Circle(SKETCH343_R)
        with Locations((28.25, -10.5)):
            Circle(SKETCH343_R_2, mode=Mode.SUBTRACT)
    extrude(amount=BOSS_EXTRUDE6_DEPTH)

    # Sketch344 → Cut-Extrude111 (cut, up to next)
    with BuildSketch(Plane.ZY.offset(-18), mode=Mode.PRIVATE) as cut_extrude111_sk1:
        with Locations((0, 23.9)):
            Rectangle(SKETCH344_W, SKETCH344_H)
    cut_extrude111_tool1 = extrude(cut_extrude111_sk1.sketch, amount=-CUT_EXTRUDE111_REACH, mode=Mode.PRIVATE) & part.part
    add(cut_extrude111_tool1.solids().sort_by_distance((18, 23.9, 0))[0], mode=Mode.SUBTRACT)


solid = part.part
